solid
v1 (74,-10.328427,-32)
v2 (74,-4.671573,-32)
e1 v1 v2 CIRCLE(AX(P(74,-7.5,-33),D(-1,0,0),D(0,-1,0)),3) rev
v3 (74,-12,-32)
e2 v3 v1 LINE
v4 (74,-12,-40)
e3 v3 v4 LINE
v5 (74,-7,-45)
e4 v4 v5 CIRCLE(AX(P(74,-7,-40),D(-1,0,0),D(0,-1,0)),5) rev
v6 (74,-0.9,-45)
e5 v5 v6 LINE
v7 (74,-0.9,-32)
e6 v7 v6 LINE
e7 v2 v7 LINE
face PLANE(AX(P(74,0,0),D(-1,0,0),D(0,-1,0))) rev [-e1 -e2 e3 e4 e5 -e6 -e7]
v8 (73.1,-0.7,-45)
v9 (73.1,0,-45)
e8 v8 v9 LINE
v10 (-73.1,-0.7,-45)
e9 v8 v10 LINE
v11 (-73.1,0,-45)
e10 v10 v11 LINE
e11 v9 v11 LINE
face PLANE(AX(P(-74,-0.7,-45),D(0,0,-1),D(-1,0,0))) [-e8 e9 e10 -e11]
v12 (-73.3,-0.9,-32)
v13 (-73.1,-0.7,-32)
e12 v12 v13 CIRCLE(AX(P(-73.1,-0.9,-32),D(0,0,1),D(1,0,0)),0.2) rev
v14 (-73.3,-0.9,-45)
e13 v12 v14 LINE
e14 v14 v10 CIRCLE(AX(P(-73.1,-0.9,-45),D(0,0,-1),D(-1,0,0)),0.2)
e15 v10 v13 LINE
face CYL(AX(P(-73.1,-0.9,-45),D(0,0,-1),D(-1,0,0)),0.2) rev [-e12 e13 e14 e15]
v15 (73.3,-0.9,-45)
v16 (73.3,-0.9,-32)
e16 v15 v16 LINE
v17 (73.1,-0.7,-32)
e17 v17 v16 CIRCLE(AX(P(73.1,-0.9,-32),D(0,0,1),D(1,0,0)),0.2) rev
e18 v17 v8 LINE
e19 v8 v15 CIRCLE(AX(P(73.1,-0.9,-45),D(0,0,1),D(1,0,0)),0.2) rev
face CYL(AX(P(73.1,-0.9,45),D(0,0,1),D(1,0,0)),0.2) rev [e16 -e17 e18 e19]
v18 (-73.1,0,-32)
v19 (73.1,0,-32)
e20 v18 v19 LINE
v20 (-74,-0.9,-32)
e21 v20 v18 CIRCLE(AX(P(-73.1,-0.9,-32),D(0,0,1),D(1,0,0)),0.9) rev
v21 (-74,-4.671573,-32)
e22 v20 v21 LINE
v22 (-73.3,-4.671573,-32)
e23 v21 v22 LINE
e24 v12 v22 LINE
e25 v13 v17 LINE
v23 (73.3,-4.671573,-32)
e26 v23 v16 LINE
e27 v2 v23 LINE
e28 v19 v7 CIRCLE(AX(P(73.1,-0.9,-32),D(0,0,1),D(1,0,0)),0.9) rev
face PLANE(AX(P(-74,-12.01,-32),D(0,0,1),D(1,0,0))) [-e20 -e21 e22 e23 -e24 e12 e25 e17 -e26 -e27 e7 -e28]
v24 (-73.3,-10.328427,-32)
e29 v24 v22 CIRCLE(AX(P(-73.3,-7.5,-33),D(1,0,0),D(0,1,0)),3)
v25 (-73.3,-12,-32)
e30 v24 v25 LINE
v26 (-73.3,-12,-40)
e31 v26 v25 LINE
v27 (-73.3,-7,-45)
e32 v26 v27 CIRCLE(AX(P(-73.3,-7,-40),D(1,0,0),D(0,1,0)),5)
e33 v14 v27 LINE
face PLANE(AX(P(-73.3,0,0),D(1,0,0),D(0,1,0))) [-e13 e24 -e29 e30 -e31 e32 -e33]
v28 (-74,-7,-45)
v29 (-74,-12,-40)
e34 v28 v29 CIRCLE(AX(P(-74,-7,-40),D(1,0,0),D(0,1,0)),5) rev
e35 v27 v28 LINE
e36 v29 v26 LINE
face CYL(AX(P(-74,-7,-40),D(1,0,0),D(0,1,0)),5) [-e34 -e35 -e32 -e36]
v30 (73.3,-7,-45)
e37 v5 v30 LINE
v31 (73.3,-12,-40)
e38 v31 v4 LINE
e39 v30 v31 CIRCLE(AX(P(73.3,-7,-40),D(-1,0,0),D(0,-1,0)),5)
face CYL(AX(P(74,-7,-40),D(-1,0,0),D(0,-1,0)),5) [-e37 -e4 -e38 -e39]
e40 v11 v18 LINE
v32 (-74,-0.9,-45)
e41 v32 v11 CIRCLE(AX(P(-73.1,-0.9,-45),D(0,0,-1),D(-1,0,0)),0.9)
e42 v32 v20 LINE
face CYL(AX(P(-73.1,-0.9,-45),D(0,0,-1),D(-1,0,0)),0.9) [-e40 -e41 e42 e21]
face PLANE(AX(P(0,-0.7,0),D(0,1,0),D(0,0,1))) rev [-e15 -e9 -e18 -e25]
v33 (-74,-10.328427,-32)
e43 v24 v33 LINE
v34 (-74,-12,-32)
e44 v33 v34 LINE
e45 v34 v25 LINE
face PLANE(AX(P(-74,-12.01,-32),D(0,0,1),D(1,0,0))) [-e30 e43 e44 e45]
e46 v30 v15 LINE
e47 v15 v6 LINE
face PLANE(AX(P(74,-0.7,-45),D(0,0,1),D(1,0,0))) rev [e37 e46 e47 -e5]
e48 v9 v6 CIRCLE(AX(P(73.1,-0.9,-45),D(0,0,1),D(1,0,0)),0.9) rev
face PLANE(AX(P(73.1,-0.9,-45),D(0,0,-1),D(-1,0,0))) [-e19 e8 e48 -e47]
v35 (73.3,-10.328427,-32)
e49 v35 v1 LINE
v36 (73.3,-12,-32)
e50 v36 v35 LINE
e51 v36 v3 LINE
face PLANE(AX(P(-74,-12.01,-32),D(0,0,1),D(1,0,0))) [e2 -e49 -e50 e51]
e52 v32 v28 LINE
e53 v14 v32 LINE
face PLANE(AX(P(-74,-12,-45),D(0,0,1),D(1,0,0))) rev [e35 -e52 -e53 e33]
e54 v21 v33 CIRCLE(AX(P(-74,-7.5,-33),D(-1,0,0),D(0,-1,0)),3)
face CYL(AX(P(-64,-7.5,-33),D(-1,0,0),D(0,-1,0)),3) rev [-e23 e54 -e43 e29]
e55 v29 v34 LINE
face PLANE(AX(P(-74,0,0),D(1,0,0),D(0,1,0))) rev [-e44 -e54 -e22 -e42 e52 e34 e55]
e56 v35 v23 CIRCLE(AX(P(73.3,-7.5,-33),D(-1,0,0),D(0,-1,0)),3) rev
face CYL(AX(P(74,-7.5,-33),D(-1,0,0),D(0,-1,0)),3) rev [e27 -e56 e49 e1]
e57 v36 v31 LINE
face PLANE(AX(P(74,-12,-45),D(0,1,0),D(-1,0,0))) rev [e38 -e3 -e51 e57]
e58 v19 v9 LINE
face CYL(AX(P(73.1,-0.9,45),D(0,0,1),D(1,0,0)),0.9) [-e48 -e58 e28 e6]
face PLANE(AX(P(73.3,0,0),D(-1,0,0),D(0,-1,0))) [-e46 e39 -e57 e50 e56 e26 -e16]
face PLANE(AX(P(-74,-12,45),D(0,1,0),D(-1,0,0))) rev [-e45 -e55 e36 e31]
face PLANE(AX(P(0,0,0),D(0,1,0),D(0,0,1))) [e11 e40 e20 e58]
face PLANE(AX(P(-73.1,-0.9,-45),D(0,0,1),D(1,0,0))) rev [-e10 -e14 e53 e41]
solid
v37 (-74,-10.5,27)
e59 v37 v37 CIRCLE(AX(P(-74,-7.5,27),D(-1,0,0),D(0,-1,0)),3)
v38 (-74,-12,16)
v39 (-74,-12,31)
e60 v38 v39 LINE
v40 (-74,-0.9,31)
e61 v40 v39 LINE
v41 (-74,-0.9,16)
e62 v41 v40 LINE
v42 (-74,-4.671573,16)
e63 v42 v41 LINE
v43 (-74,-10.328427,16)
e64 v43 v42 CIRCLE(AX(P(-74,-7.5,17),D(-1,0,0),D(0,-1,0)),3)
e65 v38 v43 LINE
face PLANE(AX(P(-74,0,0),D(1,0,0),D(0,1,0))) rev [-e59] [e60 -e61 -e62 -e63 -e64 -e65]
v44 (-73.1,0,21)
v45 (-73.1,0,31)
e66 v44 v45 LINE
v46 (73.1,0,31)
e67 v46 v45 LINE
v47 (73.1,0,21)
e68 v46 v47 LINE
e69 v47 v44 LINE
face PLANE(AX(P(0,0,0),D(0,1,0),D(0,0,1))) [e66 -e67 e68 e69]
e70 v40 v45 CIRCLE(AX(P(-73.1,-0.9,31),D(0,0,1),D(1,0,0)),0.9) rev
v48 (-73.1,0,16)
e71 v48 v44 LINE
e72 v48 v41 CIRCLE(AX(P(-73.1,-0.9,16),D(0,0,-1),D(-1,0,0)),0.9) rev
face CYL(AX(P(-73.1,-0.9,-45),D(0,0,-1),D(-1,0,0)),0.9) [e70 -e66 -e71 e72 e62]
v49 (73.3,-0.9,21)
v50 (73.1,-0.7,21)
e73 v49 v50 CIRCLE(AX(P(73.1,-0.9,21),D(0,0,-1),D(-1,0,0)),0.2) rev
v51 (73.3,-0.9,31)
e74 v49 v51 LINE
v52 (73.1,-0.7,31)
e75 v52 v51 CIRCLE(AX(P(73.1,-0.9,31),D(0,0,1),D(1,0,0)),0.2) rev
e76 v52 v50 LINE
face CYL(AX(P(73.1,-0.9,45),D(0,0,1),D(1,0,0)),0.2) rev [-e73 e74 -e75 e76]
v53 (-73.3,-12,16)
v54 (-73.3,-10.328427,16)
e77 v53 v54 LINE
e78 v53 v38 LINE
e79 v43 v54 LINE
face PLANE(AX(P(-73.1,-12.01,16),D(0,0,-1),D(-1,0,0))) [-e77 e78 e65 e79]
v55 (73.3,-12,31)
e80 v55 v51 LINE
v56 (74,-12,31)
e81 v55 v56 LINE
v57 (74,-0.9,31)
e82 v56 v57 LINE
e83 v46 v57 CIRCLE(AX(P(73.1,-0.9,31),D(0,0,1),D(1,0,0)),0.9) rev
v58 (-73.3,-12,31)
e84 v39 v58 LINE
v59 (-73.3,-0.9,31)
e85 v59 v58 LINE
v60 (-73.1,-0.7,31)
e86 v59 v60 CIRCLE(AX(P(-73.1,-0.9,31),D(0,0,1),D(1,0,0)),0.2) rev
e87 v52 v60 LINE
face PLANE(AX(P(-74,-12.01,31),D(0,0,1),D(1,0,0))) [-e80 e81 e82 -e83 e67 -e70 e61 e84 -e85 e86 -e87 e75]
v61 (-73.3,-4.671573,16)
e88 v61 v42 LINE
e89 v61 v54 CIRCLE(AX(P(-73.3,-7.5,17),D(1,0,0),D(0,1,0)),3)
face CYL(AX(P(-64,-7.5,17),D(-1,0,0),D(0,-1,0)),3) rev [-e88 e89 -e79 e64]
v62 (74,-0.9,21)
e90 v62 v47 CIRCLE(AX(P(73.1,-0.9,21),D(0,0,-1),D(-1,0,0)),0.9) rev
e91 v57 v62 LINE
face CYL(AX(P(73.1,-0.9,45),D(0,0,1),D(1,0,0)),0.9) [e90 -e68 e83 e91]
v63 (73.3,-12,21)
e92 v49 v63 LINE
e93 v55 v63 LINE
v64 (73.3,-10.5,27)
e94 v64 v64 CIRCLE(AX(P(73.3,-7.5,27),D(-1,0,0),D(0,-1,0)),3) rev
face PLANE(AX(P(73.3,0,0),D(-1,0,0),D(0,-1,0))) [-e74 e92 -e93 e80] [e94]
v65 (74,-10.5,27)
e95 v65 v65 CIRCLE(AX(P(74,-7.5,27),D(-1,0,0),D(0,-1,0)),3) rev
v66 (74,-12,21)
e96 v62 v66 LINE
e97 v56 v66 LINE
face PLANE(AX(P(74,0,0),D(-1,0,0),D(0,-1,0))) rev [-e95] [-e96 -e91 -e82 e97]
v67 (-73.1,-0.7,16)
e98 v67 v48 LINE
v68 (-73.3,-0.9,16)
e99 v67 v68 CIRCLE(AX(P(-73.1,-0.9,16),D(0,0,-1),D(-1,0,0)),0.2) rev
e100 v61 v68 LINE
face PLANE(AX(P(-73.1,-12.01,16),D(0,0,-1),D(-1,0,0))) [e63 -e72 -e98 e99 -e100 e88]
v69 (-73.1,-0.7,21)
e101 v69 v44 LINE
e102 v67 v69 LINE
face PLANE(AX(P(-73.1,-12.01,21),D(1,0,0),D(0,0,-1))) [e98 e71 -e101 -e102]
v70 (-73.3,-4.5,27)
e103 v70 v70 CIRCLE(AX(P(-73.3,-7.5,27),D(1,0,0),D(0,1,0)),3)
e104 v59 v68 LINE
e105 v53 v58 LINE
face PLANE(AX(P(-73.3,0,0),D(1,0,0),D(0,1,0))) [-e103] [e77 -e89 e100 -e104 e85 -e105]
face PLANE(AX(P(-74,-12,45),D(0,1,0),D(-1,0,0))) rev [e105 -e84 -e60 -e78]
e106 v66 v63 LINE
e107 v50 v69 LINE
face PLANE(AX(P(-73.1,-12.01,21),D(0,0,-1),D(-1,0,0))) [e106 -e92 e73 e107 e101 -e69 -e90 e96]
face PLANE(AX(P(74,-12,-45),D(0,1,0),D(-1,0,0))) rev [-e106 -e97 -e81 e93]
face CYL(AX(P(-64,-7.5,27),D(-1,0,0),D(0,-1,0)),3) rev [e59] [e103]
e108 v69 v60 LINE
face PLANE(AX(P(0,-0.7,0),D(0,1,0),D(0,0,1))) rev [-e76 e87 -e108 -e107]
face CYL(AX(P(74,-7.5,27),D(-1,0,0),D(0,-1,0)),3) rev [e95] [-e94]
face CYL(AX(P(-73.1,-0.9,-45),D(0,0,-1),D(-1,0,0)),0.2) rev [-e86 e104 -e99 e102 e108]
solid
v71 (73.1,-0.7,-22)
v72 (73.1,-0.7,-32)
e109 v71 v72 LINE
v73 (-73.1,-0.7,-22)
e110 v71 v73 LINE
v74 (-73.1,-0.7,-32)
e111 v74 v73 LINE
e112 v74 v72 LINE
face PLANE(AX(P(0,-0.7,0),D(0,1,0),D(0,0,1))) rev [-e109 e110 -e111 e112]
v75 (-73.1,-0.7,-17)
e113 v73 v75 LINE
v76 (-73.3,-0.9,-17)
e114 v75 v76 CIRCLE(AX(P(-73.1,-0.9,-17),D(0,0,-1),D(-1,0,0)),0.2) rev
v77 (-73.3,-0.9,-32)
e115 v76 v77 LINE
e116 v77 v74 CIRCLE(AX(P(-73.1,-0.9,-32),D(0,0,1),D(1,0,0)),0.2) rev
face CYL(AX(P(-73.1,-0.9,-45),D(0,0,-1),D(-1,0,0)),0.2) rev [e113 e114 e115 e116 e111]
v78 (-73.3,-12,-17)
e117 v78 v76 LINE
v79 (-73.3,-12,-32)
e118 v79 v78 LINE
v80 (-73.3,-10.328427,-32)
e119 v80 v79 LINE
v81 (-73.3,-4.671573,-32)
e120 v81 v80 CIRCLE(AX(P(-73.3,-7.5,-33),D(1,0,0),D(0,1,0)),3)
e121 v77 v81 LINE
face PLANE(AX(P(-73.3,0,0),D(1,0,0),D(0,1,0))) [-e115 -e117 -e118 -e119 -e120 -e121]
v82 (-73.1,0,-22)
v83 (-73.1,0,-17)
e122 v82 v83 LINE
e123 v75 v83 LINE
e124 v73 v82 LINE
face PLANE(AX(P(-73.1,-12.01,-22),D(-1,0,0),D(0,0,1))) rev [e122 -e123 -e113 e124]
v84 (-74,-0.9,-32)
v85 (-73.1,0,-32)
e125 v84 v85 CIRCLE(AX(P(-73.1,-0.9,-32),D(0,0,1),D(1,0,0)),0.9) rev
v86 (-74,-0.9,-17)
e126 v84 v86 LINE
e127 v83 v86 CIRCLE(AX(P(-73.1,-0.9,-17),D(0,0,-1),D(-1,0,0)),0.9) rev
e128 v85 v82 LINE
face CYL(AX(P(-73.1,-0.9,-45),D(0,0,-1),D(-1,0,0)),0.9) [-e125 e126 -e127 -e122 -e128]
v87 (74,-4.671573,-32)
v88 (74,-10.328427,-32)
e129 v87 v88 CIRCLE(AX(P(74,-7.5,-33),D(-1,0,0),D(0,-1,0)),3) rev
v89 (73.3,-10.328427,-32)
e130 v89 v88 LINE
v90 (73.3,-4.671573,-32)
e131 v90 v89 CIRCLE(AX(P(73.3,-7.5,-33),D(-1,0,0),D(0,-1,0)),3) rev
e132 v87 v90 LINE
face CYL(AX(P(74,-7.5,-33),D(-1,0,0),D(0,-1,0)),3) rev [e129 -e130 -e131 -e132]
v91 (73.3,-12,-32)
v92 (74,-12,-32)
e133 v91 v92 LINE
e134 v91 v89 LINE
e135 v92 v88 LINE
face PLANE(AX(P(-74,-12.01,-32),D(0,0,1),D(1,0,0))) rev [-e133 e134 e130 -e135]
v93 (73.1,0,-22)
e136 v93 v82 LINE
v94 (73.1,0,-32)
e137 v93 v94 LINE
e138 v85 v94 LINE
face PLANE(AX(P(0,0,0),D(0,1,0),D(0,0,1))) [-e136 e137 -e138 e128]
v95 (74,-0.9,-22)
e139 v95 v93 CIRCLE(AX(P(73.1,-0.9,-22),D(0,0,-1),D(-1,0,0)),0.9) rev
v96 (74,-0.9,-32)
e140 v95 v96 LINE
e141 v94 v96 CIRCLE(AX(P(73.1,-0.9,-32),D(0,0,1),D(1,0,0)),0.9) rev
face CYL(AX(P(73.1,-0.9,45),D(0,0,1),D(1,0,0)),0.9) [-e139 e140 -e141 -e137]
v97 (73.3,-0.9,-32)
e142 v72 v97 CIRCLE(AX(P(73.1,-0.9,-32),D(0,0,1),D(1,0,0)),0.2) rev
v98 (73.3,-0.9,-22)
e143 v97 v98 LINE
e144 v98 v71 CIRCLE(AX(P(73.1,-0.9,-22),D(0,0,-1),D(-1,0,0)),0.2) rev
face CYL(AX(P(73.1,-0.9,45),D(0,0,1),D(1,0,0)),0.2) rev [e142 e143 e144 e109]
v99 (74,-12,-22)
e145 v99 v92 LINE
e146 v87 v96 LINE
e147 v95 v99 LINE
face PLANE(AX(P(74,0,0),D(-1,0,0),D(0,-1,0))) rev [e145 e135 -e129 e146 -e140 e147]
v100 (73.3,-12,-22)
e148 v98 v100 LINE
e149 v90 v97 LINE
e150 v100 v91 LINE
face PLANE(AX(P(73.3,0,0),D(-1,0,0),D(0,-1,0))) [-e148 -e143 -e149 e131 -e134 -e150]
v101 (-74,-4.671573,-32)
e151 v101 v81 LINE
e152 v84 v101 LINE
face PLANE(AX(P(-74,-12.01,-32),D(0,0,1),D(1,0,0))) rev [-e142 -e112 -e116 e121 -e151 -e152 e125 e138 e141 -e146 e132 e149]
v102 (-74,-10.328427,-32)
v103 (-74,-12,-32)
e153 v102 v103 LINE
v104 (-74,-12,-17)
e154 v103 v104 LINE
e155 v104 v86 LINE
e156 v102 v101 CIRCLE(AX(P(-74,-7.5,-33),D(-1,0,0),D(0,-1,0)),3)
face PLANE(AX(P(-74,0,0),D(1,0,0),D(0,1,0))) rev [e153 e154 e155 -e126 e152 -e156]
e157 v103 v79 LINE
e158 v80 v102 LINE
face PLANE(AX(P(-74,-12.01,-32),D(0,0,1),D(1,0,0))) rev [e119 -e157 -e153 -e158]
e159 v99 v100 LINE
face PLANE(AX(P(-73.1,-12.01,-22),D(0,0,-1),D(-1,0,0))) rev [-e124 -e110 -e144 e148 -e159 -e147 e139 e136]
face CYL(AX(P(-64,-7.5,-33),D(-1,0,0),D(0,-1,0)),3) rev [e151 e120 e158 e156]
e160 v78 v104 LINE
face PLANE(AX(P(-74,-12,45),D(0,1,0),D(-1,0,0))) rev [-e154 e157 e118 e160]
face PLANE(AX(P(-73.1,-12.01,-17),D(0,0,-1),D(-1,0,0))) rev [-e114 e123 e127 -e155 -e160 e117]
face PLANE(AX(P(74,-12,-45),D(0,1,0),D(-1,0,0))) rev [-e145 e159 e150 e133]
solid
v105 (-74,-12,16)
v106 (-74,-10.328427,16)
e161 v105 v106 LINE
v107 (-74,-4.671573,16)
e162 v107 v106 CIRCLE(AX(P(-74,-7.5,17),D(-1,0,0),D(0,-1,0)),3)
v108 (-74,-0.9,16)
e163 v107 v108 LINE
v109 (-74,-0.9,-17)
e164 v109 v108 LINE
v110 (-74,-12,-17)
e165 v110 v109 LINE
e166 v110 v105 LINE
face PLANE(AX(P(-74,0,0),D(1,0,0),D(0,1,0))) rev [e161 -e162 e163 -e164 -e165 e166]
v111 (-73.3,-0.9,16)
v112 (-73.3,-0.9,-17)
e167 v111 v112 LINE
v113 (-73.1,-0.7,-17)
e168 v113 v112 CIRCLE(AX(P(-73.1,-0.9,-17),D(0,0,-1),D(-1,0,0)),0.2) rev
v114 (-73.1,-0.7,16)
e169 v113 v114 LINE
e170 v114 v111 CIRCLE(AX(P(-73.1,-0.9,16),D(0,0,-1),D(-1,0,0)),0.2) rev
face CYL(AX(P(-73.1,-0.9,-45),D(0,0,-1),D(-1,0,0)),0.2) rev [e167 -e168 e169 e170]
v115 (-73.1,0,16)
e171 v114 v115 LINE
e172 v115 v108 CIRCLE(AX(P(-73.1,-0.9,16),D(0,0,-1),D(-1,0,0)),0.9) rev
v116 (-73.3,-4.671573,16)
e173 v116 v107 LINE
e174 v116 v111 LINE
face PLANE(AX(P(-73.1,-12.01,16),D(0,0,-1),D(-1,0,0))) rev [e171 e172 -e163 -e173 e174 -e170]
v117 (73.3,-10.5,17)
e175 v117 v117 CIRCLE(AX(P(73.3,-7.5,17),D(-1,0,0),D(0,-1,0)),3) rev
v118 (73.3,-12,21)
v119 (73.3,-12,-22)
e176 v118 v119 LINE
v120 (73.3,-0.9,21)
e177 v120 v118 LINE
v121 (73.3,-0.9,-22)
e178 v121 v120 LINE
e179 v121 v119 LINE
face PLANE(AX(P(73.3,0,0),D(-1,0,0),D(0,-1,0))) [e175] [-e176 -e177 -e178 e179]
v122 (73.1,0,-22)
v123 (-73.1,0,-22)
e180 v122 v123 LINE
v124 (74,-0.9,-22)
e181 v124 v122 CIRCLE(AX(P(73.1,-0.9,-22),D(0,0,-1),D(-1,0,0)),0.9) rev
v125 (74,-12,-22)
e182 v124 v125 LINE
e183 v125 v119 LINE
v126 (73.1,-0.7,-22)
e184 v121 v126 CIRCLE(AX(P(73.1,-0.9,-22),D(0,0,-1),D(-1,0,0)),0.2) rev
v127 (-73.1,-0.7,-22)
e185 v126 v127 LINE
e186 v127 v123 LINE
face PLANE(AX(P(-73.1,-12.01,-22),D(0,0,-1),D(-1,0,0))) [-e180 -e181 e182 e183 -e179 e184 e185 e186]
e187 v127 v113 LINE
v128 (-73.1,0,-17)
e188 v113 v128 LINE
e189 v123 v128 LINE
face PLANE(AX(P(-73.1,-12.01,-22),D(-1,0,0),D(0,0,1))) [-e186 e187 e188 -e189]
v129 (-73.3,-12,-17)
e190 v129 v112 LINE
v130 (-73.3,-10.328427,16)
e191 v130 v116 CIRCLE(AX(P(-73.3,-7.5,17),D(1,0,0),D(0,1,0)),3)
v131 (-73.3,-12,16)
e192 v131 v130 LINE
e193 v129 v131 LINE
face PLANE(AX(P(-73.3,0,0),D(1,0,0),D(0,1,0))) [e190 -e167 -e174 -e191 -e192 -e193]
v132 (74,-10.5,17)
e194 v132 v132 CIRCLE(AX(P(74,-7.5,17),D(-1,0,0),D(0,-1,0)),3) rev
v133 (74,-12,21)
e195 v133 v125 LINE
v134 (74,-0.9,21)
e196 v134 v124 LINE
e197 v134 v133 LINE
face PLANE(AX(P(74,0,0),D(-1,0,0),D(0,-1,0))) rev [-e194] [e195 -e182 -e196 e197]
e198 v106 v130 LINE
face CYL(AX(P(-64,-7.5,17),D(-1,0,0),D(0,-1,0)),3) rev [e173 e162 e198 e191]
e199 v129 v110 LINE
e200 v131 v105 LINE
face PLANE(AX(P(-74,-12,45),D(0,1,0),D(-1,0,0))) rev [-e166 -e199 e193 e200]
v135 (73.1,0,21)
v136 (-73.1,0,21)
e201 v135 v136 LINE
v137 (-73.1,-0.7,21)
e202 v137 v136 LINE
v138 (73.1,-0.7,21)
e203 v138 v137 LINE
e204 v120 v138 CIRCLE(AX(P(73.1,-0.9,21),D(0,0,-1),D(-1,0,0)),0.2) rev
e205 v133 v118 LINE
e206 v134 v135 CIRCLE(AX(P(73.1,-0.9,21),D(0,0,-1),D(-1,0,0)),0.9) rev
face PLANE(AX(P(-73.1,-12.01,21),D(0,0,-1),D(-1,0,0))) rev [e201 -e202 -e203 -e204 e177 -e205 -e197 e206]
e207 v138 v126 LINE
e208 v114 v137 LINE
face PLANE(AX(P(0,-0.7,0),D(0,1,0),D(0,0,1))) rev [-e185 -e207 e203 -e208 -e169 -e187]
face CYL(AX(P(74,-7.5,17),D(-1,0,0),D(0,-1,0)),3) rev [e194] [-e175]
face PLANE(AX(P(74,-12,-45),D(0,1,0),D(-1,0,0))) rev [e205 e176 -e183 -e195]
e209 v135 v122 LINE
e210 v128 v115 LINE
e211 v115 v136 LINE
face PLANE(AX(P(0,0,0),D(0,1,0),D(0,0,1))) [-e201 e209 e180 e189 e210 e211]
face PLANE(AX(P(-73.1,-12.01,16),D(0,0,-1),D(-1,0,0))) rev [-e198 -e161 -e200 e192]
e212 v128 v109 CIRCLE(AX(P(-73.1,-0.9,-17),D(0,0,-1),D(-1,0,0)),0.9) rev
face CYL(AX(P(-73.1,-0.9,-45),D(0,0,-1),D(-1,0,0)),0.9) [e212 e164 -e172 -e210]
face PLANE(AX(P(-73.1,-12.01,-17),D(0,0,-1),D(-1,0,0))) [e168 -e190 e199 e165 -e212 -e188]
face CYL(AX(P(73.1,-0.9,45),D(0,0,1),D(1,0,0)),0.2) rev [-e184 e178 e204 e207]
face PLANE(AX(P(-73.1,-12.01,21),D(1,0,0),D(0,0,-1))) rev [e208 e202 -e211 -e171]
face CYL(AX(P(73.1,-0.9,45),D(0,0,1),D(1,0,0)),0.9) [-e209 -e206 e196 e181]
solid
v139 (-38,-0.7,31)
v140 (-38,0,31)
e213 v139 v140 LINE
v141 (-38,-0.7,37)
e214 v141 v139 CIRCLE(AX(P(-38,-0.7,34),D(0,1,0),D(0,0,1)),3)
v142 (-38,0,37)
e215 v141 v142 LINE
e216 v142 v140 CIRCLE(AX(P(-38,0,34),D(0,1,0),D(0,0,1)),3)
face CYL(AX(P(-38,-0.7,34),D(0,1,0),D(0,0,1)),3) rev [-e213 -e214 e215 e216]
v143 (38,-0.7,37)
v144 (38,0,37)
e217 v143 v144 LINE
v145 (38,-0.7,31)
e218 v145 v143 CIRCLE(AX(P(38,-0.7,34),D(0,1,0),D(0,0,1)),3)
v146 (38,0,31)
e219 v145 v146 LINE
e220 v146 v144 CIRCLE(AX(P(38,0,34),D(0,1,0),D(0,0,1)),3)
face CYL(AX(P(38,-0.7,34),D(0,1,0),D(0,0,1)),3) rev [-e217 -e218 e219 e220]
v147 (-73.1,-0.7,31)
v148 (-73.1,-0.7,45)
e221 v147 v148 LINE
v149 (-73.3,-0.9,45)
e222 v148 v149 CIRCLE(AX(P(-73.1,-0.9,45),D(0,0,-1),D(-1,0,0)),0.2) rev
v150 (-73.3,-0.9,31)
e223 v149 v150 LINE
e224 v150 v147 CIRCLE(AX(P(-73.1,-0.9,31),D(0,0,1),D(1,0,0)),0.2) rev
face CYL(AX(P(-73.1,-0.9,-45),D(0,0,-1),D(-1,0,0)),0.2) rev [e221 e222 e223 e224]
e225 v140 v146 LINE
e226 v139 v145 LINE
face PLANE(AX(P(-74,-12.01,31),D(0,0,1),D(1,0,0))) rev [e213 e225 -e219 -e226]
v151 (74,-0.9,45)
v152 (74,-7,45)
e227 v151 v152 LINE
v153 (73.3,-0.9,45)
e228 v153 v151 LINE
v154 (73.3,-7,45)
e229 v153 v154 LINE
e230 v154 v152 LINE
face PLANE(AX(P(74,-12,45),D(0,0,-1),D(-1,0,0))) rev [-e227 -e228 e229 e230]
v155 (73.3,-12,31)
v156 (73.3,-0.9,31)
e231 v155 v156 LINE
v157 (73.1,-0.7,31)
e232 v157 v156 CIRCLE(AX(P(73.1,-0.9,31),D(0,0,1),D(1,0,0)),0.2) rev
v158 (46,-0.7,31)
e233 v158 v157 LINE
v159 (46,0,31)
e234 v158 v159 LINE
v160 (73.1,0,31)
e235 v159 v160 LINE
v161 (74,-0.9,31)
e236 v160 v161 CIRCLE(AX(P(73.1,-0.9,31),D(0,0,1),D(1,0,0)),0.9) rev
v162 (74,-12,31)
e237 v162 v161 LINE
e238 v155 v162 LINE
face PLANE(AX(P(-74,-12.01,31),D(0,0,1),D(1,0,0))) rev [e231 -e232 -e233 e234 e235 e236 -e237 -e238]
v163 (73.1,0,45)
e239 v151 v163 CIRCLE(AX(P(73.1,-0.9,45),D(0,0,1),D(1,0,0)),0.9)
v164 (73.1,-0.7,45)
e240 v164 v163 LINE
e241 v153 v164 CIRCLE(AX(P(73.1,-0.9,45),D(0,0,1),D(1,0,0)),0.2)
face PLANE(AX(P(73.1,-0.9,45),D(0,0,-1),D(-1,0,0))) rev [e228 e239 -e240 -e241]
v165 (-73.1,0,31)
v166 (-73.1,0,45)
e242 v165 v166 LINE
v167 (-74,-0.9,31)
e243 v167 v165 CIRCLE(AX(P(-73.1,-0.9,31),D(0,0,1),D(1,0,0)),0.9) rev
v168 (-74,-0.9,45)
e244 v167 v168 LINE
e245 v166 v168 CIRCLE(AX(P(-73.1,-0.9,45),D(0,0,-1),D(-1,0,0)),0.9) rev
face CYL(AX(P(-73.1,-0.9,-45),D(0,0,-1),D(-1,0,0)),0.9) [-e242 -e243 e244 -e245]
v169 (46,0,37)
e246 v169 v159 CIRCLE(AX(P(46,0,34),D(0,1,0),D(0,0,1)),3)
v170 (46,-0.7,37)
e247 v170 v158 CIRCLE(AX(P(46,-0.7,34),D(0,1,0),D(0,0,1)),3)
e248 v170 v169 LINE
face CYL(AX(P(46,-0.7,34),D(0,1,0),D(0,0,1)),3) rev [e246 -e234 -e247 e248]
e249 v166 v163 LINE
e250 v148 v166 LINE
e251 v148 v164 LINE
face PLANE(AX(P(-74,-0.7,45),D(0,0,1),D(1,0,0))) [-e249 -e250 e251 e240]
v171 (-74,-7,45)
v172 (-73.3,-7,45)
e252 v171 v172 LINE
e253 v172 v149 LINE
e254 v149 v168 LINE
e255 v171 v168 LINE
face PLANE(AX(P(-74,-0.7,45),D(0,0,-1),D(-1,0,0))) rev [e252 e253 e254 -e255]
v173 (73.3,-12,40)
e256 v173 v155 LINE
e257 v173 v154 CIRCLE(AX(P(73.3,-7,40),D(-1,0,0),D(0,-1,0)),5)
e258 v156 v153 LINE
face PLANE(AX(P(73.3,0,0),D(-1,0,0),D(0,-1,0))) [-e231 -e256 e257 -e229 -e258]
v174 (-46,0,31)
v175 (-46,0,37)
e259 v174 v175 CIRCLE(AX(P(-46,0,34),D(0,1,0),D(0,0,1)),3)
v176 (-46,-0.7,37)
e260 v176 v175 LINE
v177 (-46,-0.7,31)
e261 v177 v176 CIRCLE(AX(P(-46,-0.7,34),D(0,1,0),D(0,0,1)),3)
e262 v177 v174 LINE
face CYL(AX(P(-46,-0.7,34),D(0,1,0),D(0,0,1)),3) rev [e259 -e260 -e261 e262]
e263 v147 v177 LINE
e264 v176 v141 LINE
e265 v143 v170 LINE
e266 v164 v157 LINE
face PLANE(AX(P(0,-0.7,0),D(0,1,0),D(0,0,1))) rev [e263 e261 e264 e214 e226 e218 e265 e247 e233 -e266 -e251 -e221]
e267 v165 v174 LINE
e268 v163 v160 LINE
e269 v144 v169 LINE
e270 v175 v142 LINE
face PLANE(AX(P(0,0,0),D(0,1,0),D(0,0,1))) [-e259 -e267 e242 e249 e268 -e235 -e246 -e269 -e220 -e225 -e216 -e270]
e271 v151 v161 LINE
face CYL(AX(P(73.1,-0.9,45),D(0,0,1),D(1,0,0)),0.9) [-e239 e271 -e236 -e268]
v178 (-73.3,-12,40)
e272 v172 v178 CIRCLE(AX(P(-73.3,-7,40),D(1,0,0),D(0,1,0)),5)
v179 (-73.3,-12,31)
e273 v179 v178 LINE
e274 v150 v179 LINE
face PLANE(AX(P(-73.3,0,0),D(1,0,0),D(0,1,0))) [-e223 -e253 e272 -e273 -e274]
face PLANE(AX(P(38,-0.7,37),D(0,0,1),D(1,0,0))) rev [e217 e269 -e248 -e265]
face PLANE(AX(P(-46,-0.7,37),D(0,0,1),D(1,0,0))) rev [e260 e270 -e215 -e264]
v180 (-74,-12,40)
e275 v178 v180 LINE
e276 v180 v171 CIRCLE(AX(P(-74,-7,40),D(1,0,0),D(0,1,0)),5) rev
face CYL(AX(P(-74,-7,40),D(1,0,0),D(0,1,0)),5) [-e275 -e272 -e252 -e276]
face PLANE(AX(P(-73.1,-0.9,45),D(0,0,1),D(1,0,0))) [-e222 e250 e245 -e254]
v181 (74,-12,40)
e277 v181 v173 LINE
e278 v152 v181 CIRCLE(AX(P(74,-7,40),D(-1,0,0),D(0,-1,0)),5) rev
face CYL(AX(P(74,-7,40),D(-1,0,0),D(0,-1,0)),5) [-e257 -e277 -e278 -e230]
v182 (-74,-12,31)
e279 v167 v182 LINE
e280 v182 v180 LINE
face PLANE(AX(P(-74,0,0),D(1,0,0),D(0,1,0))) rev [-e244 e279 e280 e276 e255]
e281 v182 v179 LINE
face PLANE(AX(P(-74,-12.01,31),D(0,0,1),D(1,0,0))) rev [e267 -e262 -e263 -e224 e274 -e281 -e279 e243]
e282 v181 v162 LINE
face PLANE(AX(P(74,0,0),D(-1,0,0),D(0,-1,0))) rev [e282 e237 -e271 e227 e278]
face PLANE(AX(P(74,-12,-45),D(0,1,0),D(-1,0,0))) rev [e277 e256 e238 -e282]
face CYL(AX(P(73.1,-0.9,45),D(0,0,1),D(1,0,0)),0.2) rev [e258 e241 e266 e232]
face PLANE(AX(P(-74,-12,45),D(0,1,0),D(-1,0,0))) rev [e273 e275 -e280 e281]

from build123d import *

# Parameters (mm, degrees)
SKETCH_1_W                         = 148
SKETCH_1_H                         = 90
SM_BASE_FLANGE_1_DEPTH             = 0.7
SM_EDGE_FLANGE_1_STRIP_W           = 3.2
SM_EDGE_FLANGE_1_STRIP_H           = 0.7
SM_EDGE_FLANGE_1_STRIP_CUT_DEPTH   = 90
SM_EDGE_FLANGE_1_STRIP_2_W         = 3.2
SM_EDGE_FLANGE_1_STRIP_2_H         = 0.7
SM_EDGE_FLANGE_1_STRIP_CUT_2_DEPTH = 90
SM_EDGE_FLANGE_1_DEPTH             = 90
SM_EDGE_FLANGE_1_PROFILE_W         = 90
SM_EDGE_FLANGE_1_PROFILE_H         = 11.1
SM_EDGE_FLANGE_1_PROFILE_R         = 3
SM_EDGE_FLANGE_1_FLAT_DEPTH        = 0.7
SM_EDGE_FLANGE_1_BEND_DEPTH        = 90
FILLET_2_R                         = 5
CUT_EXTRUDE_START                  = -10
SKETCH_15_R                        = 3
CUT_EXTRUDE_1_DEPTH                = 10
SPLIT_BODIES_1_SURFACE_1_1_BACK    = 174.632
SPLIT_BODIES_1_SURFACE_1_1_DEPTH   = 349.264
SPLIT_BODIES_1_SURFACE_1_2_BACK    = 174.632
SPLIT_BODIES_1_SURFACE_1_2_DEPTH   = 349.264
SPLIT_BODIES_1_SURFACE_2_3_BACK    = 174.632
SPLIT_BODIES_1_SURFACE_2_3_DEPTH   = 349.264
SPLIT_BODIES_1_SURFACE_2_4_BACK    = 174.632
SPLIT_BODIES_1_SURFACE_2_4_DEPTH   = 349.264
SPLIT_BODIES_1_SURFACE_3_5_BACK    = 174.632
SPLIT_BODIES_1_SURFACE_3_5_DEPTH   = 349.264
SPLIT_BODIES_1_SURFACE_3_6_BACK    = 174.632
SPLIT_BODIES_1_SURFACE_3_6_DEPTH   = 349.264
SPLIT_BODIES_1_SURFACE_4_7_BACK    = 174.632
SPLIT_BODIES_1_SURFACE_4_7_DEPTH   = 349.264
SPLIT_BODIES_1_SURFACE_4_8_BACK    = 174.632
SPLIT_BODIES_1_SURFACE_4_8_DEPTH   = 349.264


# Sheet-metal steps are written as plain solids
with BuildPart() as part:
    # Sketch 1 → 基体-法兰1 (new body)
    with BuildSketch(Plane(origin=(0, 0, 0), x_dir=(1, 0, 0), z_dir=(0, 1, 0))):
        Rectangle(SKETCH_1_W, SKETCH_1_H)
        with BuildLine():
            Line((-46, -31), (-38, -31))
            ThreePointArc((-38, -31), (-35, -34), (-38, -37))
            Line((-38, -37), (-46, -37))
            ThreePointArc((-46, -37), (-49, -34), (-46, -31))
        make_face(mode=Mode.SUBTRACT)
        with BuildLine():
            Line((38, -31), (46, -31))
            ThreePointArc((46, -31), (49, -34), (46, -37))
            Line((46, -37), (38, -37))
            ThreePointArc((38, -37), (35, -34), (38, -31))
        make_face(mode=Mode.SUBTRACT)
    extrude(amount=-SM_BASE_FLANGE_1_DEPTH)

    # 边线-法兰1 strip (across the edge) → 边线-法兰1 strip cut (cut)
    with BuildSketch(Plane(origin=(74, -0.7, -45), x_dir=(-1, 0, 0), z_dir=(0, 0, 1))):
        with Locations((-0.7, -0.35)):
            Rectangle(SM_EDGE_FLANGE_1_STRIP_W, SM_EDGE_FLANGE_1_STRIP_H)
    extrude(amount=SM_EDGE_FLANGE_1_STRIP_CUT_DEPTH, mode=Mode.SUBTRACT)

    # 边线-法兰1 strip 2 (across the edge) → 边线-法兰1 strip cut 2 (cut)
    with BuildSketch(Plane(origin=(-74, -0.7, 45), x_dir=(1, 0, 0), z_dir=(0, 0, -1))):
        with Locations((-0.7, -0.35)):
            Rectangle(SM_EDGE_FLANGE_1_STRIP_2_W, SM_EDGE_FLANGE_1_STRIP_2_H)
    extrude(amount=SM_EDGE_FLANGE_1_STRIP_CUT_2_DEPTH, mode=Mode.SUBTRACT)

    # 边线-法兰1 bend section (across the edge) → 边线-法兰1 (add)
    with BuildSketch(Plane(origin=(74, -0.7, -45), x_dir=(-1, 0, 0), z_dir=(0, 0, 1))):
        with BuildLine():
            Line((0, 0.2), (0.7, 0.2))
            ThreePointArc((0.7, 0.2), (0.758578644, 0.058578644), (0.9, 0))
            Line((0.9, 0), (0.9, -0.7))
            ThreePointArc((0.9, -0.7), (0.263603897, -0.436396103), (0, 0.2))
        make_face()
    extrude(amount=SM_EDGE_FLANGE_1_DEPTH)

    # 边线-法兰1 profile (on flange) → 边线-法兰1 flat (add)
    with BuildSketch(Plane(origin=(74, -0.7, 0), x_dir=(0, 0, 1), z_dir=(1, 0, 0))):
        with Locations((0, 5.75)):
            Rectangle(SM_EDGE_FLANGE_1_PROFILE_W, SM_EDGE_FLANGE_1_PROFILE_H)
        with Locations((17, 6.8)):
            Circle(SM_EDGE_FLANGE_1_PROFILE_R, mode=Mode.SUBTRACT)
        with Locations((27, 6.8)):
            Circle(SM_EDGE_FLANGE_1_PROFILE_R, mode=Mode.SUBTRACT)
        with Locations((-33, 6.8)):
            Circle(SM_EDGE_FLANGE_1_PROFILE_R, mode=Mode.SUBTRACT)
    extrude(amount=-SM_EDGE_FLANGE_1_FLAT_DEPTH)

    # 边线-法兰1 section (across the edge) → 边线-法兰1 bend (add)
    with BuildSketch(Plane(origin=(-74, -0.7, 45), x_dir=(1, 0, 0), z_dir=(0, 0, -1))):
        with BuildLine():
            Line((0, 0.2), (0, 11.3))
            Line((0, 11.3), (0.7, 11.3))
            Line((0.7, 11.3), (0.7, 0.2))
            ThreePointArc((0.7, 0.2), (0.758578644, 0.058578644), (0.9, 0))
            Line((0.9, 0), (0.9, -0.7))
            ThreePointArc((0.9, -0.7), (0.263603897, -0.436396103), (0, 0.2))
        make_face()
    extrude(amount=SM_EDGE_FLANGE_1_BEND_DEPTH)

    # 圆角2
    fillet_2_edges = [part.edges().sort_by_distance(p)[0] for p in [
        (-73.65, -12, 45),
        (-73.65, -12, -45),
        (73.65, -12, -45),
        (73.65, -12, 45),
    ]]
    fillet(fillet_2_edges, radius=FILLET_2_R)

    # 草图15 → 切除-拉伸1 (cut)
    with BuildSketch(Plane.ZY.offset(74).offset(CUT_EXTRUDE_START)):
        with Locations(Location((-33, -7.5, 0), (0, 0, 270))):
            Circle(SKETCH_15_R)
        with Locations(Location((17, -7.5, 0), (0, 0, 270))):
            Circle(SKETCH_15_R)
        with Locations(Location((27, -7.5, 0), (0, 0, 270))):
            Circle(SKETCH_15_R)
    extrude(amount=CUT_EXTRUDE_1_DEPTH, mode=Mode.SUBTRACT)


with BuildPart() as body_2:
    # Split Bodies 1: the piece behind the surface
    add(part.part)
    # Split Bodies 1 surface 1: a surface, the sketch's curves swept straight by 349.264 mm
    with BuildLine(Plane(origin=(0, 0, 0), x_dir=(1, 0, 0), z_dir=(0, 1, 0)).offset(-SPLIT_BODIES_1_SURFACE_1_1_BACK), mode=Mode.PRIVATE) as split_bodies_1_surface_1_1_path:
        Line((-74, 32), (74, 32))
    split_bodies_1_surface_1_1 = Shell.extrude(split_bodies_1_surface_1_1_path.wire(), (0 * SPLIT_BODIES_1_SURFACE_1_1_DEPTH, 1 * SPLIT_BODIES_1_SURFACE_1_1_DEPTH, 0 * SPLIT_BODIES_1_SURFACE_1_1_DEPTH))
    split(bisect_by=split_bodies_1_surface_1_1, keep=Keep.BOTTOM)


with BuildPart() as part_1:
    add(part.part)

    # Split Bodies 1: split by a surface, the side it looks to stays
    # Split Bodies 1 surface 1: a surface, the sketch's curves swept straight by 349.264 mm
    with BuildLine(Plane(origin=(0, 0, 0), x_dir=(1, 0, 0), z_dir=(0, 1, 0)).offset(-SPLIT_BODIES_1_SURFACE_1_2_BACK), mode=Mode.PRIVATE) as split_bodies_1_surface_1_2_path:
        Line((-74, 32), (74, 32))
    split_bodies_1_surface_1_2 = Shell.extrude(split_bodies_1_surface_1_2_path.wire(), (0 * SPLIT_BODIES_1_SURFACE_1_2_DEPTH, 1 * SPLIT_BODIES_1_SURFACE_1_2_DEPTH, 0 * SPLIT_BODIES_1_SURFACE_1_2_DEPTH))
    split(bisect_by=split_bodies_1_surface_1_2, keep=Keep.TOP)


with BuildPart() as body_3:
    # Split Bodies 1 2 body 2: the piece behind the surface
    add(body_2.part)
    # Split Bodies 1 surface 2: a surface, the sketch's curves swept straight by 349.264 mm
    with BuildLine(Plane(origin=(0, 0, 0), x_dir=(1, 0, 0), z_dir=(0, 1, 0)).offset(-SPLIT_BODIES_1_SURFACE_2_3_BACK), mode=Mode.PRIVATE) as split_bodies_1_surface_2_3_path:
        Line((-74, -31), (74, -31))
    split_bodies_1_surface_2_3 = Shell.extrude(split_bodies_1_surface_2_3_path.wire(), (0 * SPLIT_BODIES_1_SURFACE_2_3_DEPTH, 1 * SPLIT_BODIES_1_SURFACE_2_3_DEPTH, 0 * SPLIT_BODIES_1_SURFACE_2_3_DEPTH))
    split(bisect_by=split_bodies_1_surface_2_3, keep=Keep.BOTTOM)


with BuildPart() as body_2_1:
    add(body_2.part)

    # Split Bodies 1 2 body 2: split by a surface, the side it looks to stays
    # Split Bodies 1 surface 2: a surface, the sketch's curves swept straight by 349.264 mm
    with BuildLine(Plane(origin=(0, 0, 0), x_dir=(1, 0, 0), z_dir=(0, 1, 0)).offset(-SPLIT_BODIES_1_SURFACE_2_4_BACK), mode=Mode.PRIVATE) as split_bodies_1_surface_2_4_path:
        Line((-74, -31), (74, -31))
    split_bodies_1_surface_2_4 = Shell.extrude(split_bodies_1_surface_2_4_path.wire(), (0 * SPLIT_BODIES_1_SURFACE_2_4_DEPTH, 1 * SPLIT_BODIES_1_SURFACE_2_4_DEPTH, 0 * SPLIT_BODIES_1_SURFACE_2_4_DEPTH))
    split(bisect_by=split_bodies_1_surface_2_4, keep=Keep.TOP)


with BuildPart() as body_4:
    # Split Bodies 1 3 body 2: the piece behind the surface
    add(body_2_1.part)
    # Split Bodies 1 surface 3: a surface, the sketch's curves swept straight by 349.264 mm
    with BuildLine(Plane(origin=(0, 0, 0), x_dir=(1, 0, 0), z_dir=(0, 1, 0)).offset(-SPLIT_BODIES_1_SURFACE_3_5_BACK), mode=Mode.PRIVATE) as split_bodies_1_surface_3_5_path:
        Line((-74, -16), (-73.1, -16))
        Line((-73.1, -16), (-73.1, -21))
        Line((-73.1, -21), (74, -21))
    split_bodies_1_surface_3_5 = Shell.extrude(split_bodies_1_surface_3_5_path.wire(), (0 * SPLIT_BODIES_1_SURFACE_3_5_DEPTH, 1 * SPLIT_BODIES_1_SURFACE_3_5_DEPTH, 0 * SPLIT_BODIES_1_SURFACE_3_5_DEPTH))
    split(bisect_by=split_bodies_1_surface_3_5, keep=Keep.BOTTOM)


with BuildPart() as body_2_2:
    add(body_2_1.part)

    # Split Bodies 1 3 body 2: split by a surface, the side it looks to stays
    # Split Bodies 1 surface 3: a surface, the sketch's curves swept straight by 349.264 mm
    with BuildLine(Plane(origin=(0, 0, 0), x_dir=(1, 0, 0), z_dir=(0, 1, 0)).offset(-SPLIT_BODIES_1_SURFACE_3_6_BACK), mode=Mode.PRIVATE) as split_bodies_1_surface_3_6_path:
        Line((-74, -16), (-73.1, -16))
        Line((-73.1, -16), (-73.1, -21))
        Line((-73.1, -21), (74, -21))
    split_bodies_1_surface_3_6 = Shell.extrude(split_bodies_1_surface_3_6_path.wire(), (0 * SPLIT_BODIES_1_SURFACE_3_6_DEPTH, 1 * SPLIT_BODIES_1_SURFACE_3_6_DEPTH, 0 * SPLIT_BODIES_1_SURFACE_3_6_DEPTH))
    split(bisect_by=split_bodies_1_surface_3_6, keep=Keep.TOP)


with BuildPart() as body_5_2:
    # Split Bodies 1 4 body 2: the piece behind the surface
    add(body_2_2.part)
    # Split Bodies 1 surface 4: a surface, the sketch's curves swept straight by 349.264 mm
    with BuildLine(Plane(origin=(0, 0, 0), x_dir=(1, 0, 0), z_dir=(0, 1, 0)).offset(-SPLIT_BODIES_1_SURFACE_4_7_BACK), mode=Mode.PRIVATE) as split_bodies_1_surface_4_7_path:
        Line((-74, 17), (-73.1, 17))
        Line((-73.1, 17), (-73.1, 22))
        Line((-73.1, 22), (74, 22))
    split_bodies_1_surface_4_7 = Shell.extrude(split_bodies_1_surface_4_7_path.wire(), (0 * SPLIT_BODIES_1_SURFACE_4_7_DEPTH, 1 * SPLIT_BODIES_1_SURFACE_4_7_DEPTH, 0 * SPLIT_BODIES_1_SURFACE_4_7_DEPTH))
    split(bisect_by=split_bodies_1_surface_4_7, keep=Keep.BOTTOM)


with BuildPart() as body_2_3:
    add(body_2_2.part)

    # Split Bodies 1 4 body 2: split by a surface, the side it looks to stays
    # Split Bodies 1 surface 4: a surface, the sketch's curves swept straight by 349.264 mm
    with BuildLine(Plane(origin=(0, 0, 0), x_dir=(1, 0, 0), z_dir=(0, 1, 0)).offset(-SPLIT_BODIES_1_SURFACE_4_8_BACK), mode=Mode.PRIVATE) as split_bodies_1_surface_4_8_path:
        Line((-74, 17), (-73.1, 17))
        Line((-73.1, 17), (-73.1, 22))
        Line((-73.1, 22), (74, 22))
    split_bodies_1_surface_4_8 = Shell.extrude(split_bodies_1_surface_4_8_path.wire(), (0 * SPLIT_BODIES_1_SURFACE_4_8_DEPTH, 1 * SPLIT_BODIES_1_SURFACE_4_8_DEPTH, 0 * SPLIT_BODIES_1_SURFACE_4_8_DEPTH))
    split(bisect_by=split_bodies_1_surface_4_8, keep=Keep.TOP)


solid = Compound([part_1.part, body_3.part, body_4.part, body_5_2.part, body_2_3.part])
